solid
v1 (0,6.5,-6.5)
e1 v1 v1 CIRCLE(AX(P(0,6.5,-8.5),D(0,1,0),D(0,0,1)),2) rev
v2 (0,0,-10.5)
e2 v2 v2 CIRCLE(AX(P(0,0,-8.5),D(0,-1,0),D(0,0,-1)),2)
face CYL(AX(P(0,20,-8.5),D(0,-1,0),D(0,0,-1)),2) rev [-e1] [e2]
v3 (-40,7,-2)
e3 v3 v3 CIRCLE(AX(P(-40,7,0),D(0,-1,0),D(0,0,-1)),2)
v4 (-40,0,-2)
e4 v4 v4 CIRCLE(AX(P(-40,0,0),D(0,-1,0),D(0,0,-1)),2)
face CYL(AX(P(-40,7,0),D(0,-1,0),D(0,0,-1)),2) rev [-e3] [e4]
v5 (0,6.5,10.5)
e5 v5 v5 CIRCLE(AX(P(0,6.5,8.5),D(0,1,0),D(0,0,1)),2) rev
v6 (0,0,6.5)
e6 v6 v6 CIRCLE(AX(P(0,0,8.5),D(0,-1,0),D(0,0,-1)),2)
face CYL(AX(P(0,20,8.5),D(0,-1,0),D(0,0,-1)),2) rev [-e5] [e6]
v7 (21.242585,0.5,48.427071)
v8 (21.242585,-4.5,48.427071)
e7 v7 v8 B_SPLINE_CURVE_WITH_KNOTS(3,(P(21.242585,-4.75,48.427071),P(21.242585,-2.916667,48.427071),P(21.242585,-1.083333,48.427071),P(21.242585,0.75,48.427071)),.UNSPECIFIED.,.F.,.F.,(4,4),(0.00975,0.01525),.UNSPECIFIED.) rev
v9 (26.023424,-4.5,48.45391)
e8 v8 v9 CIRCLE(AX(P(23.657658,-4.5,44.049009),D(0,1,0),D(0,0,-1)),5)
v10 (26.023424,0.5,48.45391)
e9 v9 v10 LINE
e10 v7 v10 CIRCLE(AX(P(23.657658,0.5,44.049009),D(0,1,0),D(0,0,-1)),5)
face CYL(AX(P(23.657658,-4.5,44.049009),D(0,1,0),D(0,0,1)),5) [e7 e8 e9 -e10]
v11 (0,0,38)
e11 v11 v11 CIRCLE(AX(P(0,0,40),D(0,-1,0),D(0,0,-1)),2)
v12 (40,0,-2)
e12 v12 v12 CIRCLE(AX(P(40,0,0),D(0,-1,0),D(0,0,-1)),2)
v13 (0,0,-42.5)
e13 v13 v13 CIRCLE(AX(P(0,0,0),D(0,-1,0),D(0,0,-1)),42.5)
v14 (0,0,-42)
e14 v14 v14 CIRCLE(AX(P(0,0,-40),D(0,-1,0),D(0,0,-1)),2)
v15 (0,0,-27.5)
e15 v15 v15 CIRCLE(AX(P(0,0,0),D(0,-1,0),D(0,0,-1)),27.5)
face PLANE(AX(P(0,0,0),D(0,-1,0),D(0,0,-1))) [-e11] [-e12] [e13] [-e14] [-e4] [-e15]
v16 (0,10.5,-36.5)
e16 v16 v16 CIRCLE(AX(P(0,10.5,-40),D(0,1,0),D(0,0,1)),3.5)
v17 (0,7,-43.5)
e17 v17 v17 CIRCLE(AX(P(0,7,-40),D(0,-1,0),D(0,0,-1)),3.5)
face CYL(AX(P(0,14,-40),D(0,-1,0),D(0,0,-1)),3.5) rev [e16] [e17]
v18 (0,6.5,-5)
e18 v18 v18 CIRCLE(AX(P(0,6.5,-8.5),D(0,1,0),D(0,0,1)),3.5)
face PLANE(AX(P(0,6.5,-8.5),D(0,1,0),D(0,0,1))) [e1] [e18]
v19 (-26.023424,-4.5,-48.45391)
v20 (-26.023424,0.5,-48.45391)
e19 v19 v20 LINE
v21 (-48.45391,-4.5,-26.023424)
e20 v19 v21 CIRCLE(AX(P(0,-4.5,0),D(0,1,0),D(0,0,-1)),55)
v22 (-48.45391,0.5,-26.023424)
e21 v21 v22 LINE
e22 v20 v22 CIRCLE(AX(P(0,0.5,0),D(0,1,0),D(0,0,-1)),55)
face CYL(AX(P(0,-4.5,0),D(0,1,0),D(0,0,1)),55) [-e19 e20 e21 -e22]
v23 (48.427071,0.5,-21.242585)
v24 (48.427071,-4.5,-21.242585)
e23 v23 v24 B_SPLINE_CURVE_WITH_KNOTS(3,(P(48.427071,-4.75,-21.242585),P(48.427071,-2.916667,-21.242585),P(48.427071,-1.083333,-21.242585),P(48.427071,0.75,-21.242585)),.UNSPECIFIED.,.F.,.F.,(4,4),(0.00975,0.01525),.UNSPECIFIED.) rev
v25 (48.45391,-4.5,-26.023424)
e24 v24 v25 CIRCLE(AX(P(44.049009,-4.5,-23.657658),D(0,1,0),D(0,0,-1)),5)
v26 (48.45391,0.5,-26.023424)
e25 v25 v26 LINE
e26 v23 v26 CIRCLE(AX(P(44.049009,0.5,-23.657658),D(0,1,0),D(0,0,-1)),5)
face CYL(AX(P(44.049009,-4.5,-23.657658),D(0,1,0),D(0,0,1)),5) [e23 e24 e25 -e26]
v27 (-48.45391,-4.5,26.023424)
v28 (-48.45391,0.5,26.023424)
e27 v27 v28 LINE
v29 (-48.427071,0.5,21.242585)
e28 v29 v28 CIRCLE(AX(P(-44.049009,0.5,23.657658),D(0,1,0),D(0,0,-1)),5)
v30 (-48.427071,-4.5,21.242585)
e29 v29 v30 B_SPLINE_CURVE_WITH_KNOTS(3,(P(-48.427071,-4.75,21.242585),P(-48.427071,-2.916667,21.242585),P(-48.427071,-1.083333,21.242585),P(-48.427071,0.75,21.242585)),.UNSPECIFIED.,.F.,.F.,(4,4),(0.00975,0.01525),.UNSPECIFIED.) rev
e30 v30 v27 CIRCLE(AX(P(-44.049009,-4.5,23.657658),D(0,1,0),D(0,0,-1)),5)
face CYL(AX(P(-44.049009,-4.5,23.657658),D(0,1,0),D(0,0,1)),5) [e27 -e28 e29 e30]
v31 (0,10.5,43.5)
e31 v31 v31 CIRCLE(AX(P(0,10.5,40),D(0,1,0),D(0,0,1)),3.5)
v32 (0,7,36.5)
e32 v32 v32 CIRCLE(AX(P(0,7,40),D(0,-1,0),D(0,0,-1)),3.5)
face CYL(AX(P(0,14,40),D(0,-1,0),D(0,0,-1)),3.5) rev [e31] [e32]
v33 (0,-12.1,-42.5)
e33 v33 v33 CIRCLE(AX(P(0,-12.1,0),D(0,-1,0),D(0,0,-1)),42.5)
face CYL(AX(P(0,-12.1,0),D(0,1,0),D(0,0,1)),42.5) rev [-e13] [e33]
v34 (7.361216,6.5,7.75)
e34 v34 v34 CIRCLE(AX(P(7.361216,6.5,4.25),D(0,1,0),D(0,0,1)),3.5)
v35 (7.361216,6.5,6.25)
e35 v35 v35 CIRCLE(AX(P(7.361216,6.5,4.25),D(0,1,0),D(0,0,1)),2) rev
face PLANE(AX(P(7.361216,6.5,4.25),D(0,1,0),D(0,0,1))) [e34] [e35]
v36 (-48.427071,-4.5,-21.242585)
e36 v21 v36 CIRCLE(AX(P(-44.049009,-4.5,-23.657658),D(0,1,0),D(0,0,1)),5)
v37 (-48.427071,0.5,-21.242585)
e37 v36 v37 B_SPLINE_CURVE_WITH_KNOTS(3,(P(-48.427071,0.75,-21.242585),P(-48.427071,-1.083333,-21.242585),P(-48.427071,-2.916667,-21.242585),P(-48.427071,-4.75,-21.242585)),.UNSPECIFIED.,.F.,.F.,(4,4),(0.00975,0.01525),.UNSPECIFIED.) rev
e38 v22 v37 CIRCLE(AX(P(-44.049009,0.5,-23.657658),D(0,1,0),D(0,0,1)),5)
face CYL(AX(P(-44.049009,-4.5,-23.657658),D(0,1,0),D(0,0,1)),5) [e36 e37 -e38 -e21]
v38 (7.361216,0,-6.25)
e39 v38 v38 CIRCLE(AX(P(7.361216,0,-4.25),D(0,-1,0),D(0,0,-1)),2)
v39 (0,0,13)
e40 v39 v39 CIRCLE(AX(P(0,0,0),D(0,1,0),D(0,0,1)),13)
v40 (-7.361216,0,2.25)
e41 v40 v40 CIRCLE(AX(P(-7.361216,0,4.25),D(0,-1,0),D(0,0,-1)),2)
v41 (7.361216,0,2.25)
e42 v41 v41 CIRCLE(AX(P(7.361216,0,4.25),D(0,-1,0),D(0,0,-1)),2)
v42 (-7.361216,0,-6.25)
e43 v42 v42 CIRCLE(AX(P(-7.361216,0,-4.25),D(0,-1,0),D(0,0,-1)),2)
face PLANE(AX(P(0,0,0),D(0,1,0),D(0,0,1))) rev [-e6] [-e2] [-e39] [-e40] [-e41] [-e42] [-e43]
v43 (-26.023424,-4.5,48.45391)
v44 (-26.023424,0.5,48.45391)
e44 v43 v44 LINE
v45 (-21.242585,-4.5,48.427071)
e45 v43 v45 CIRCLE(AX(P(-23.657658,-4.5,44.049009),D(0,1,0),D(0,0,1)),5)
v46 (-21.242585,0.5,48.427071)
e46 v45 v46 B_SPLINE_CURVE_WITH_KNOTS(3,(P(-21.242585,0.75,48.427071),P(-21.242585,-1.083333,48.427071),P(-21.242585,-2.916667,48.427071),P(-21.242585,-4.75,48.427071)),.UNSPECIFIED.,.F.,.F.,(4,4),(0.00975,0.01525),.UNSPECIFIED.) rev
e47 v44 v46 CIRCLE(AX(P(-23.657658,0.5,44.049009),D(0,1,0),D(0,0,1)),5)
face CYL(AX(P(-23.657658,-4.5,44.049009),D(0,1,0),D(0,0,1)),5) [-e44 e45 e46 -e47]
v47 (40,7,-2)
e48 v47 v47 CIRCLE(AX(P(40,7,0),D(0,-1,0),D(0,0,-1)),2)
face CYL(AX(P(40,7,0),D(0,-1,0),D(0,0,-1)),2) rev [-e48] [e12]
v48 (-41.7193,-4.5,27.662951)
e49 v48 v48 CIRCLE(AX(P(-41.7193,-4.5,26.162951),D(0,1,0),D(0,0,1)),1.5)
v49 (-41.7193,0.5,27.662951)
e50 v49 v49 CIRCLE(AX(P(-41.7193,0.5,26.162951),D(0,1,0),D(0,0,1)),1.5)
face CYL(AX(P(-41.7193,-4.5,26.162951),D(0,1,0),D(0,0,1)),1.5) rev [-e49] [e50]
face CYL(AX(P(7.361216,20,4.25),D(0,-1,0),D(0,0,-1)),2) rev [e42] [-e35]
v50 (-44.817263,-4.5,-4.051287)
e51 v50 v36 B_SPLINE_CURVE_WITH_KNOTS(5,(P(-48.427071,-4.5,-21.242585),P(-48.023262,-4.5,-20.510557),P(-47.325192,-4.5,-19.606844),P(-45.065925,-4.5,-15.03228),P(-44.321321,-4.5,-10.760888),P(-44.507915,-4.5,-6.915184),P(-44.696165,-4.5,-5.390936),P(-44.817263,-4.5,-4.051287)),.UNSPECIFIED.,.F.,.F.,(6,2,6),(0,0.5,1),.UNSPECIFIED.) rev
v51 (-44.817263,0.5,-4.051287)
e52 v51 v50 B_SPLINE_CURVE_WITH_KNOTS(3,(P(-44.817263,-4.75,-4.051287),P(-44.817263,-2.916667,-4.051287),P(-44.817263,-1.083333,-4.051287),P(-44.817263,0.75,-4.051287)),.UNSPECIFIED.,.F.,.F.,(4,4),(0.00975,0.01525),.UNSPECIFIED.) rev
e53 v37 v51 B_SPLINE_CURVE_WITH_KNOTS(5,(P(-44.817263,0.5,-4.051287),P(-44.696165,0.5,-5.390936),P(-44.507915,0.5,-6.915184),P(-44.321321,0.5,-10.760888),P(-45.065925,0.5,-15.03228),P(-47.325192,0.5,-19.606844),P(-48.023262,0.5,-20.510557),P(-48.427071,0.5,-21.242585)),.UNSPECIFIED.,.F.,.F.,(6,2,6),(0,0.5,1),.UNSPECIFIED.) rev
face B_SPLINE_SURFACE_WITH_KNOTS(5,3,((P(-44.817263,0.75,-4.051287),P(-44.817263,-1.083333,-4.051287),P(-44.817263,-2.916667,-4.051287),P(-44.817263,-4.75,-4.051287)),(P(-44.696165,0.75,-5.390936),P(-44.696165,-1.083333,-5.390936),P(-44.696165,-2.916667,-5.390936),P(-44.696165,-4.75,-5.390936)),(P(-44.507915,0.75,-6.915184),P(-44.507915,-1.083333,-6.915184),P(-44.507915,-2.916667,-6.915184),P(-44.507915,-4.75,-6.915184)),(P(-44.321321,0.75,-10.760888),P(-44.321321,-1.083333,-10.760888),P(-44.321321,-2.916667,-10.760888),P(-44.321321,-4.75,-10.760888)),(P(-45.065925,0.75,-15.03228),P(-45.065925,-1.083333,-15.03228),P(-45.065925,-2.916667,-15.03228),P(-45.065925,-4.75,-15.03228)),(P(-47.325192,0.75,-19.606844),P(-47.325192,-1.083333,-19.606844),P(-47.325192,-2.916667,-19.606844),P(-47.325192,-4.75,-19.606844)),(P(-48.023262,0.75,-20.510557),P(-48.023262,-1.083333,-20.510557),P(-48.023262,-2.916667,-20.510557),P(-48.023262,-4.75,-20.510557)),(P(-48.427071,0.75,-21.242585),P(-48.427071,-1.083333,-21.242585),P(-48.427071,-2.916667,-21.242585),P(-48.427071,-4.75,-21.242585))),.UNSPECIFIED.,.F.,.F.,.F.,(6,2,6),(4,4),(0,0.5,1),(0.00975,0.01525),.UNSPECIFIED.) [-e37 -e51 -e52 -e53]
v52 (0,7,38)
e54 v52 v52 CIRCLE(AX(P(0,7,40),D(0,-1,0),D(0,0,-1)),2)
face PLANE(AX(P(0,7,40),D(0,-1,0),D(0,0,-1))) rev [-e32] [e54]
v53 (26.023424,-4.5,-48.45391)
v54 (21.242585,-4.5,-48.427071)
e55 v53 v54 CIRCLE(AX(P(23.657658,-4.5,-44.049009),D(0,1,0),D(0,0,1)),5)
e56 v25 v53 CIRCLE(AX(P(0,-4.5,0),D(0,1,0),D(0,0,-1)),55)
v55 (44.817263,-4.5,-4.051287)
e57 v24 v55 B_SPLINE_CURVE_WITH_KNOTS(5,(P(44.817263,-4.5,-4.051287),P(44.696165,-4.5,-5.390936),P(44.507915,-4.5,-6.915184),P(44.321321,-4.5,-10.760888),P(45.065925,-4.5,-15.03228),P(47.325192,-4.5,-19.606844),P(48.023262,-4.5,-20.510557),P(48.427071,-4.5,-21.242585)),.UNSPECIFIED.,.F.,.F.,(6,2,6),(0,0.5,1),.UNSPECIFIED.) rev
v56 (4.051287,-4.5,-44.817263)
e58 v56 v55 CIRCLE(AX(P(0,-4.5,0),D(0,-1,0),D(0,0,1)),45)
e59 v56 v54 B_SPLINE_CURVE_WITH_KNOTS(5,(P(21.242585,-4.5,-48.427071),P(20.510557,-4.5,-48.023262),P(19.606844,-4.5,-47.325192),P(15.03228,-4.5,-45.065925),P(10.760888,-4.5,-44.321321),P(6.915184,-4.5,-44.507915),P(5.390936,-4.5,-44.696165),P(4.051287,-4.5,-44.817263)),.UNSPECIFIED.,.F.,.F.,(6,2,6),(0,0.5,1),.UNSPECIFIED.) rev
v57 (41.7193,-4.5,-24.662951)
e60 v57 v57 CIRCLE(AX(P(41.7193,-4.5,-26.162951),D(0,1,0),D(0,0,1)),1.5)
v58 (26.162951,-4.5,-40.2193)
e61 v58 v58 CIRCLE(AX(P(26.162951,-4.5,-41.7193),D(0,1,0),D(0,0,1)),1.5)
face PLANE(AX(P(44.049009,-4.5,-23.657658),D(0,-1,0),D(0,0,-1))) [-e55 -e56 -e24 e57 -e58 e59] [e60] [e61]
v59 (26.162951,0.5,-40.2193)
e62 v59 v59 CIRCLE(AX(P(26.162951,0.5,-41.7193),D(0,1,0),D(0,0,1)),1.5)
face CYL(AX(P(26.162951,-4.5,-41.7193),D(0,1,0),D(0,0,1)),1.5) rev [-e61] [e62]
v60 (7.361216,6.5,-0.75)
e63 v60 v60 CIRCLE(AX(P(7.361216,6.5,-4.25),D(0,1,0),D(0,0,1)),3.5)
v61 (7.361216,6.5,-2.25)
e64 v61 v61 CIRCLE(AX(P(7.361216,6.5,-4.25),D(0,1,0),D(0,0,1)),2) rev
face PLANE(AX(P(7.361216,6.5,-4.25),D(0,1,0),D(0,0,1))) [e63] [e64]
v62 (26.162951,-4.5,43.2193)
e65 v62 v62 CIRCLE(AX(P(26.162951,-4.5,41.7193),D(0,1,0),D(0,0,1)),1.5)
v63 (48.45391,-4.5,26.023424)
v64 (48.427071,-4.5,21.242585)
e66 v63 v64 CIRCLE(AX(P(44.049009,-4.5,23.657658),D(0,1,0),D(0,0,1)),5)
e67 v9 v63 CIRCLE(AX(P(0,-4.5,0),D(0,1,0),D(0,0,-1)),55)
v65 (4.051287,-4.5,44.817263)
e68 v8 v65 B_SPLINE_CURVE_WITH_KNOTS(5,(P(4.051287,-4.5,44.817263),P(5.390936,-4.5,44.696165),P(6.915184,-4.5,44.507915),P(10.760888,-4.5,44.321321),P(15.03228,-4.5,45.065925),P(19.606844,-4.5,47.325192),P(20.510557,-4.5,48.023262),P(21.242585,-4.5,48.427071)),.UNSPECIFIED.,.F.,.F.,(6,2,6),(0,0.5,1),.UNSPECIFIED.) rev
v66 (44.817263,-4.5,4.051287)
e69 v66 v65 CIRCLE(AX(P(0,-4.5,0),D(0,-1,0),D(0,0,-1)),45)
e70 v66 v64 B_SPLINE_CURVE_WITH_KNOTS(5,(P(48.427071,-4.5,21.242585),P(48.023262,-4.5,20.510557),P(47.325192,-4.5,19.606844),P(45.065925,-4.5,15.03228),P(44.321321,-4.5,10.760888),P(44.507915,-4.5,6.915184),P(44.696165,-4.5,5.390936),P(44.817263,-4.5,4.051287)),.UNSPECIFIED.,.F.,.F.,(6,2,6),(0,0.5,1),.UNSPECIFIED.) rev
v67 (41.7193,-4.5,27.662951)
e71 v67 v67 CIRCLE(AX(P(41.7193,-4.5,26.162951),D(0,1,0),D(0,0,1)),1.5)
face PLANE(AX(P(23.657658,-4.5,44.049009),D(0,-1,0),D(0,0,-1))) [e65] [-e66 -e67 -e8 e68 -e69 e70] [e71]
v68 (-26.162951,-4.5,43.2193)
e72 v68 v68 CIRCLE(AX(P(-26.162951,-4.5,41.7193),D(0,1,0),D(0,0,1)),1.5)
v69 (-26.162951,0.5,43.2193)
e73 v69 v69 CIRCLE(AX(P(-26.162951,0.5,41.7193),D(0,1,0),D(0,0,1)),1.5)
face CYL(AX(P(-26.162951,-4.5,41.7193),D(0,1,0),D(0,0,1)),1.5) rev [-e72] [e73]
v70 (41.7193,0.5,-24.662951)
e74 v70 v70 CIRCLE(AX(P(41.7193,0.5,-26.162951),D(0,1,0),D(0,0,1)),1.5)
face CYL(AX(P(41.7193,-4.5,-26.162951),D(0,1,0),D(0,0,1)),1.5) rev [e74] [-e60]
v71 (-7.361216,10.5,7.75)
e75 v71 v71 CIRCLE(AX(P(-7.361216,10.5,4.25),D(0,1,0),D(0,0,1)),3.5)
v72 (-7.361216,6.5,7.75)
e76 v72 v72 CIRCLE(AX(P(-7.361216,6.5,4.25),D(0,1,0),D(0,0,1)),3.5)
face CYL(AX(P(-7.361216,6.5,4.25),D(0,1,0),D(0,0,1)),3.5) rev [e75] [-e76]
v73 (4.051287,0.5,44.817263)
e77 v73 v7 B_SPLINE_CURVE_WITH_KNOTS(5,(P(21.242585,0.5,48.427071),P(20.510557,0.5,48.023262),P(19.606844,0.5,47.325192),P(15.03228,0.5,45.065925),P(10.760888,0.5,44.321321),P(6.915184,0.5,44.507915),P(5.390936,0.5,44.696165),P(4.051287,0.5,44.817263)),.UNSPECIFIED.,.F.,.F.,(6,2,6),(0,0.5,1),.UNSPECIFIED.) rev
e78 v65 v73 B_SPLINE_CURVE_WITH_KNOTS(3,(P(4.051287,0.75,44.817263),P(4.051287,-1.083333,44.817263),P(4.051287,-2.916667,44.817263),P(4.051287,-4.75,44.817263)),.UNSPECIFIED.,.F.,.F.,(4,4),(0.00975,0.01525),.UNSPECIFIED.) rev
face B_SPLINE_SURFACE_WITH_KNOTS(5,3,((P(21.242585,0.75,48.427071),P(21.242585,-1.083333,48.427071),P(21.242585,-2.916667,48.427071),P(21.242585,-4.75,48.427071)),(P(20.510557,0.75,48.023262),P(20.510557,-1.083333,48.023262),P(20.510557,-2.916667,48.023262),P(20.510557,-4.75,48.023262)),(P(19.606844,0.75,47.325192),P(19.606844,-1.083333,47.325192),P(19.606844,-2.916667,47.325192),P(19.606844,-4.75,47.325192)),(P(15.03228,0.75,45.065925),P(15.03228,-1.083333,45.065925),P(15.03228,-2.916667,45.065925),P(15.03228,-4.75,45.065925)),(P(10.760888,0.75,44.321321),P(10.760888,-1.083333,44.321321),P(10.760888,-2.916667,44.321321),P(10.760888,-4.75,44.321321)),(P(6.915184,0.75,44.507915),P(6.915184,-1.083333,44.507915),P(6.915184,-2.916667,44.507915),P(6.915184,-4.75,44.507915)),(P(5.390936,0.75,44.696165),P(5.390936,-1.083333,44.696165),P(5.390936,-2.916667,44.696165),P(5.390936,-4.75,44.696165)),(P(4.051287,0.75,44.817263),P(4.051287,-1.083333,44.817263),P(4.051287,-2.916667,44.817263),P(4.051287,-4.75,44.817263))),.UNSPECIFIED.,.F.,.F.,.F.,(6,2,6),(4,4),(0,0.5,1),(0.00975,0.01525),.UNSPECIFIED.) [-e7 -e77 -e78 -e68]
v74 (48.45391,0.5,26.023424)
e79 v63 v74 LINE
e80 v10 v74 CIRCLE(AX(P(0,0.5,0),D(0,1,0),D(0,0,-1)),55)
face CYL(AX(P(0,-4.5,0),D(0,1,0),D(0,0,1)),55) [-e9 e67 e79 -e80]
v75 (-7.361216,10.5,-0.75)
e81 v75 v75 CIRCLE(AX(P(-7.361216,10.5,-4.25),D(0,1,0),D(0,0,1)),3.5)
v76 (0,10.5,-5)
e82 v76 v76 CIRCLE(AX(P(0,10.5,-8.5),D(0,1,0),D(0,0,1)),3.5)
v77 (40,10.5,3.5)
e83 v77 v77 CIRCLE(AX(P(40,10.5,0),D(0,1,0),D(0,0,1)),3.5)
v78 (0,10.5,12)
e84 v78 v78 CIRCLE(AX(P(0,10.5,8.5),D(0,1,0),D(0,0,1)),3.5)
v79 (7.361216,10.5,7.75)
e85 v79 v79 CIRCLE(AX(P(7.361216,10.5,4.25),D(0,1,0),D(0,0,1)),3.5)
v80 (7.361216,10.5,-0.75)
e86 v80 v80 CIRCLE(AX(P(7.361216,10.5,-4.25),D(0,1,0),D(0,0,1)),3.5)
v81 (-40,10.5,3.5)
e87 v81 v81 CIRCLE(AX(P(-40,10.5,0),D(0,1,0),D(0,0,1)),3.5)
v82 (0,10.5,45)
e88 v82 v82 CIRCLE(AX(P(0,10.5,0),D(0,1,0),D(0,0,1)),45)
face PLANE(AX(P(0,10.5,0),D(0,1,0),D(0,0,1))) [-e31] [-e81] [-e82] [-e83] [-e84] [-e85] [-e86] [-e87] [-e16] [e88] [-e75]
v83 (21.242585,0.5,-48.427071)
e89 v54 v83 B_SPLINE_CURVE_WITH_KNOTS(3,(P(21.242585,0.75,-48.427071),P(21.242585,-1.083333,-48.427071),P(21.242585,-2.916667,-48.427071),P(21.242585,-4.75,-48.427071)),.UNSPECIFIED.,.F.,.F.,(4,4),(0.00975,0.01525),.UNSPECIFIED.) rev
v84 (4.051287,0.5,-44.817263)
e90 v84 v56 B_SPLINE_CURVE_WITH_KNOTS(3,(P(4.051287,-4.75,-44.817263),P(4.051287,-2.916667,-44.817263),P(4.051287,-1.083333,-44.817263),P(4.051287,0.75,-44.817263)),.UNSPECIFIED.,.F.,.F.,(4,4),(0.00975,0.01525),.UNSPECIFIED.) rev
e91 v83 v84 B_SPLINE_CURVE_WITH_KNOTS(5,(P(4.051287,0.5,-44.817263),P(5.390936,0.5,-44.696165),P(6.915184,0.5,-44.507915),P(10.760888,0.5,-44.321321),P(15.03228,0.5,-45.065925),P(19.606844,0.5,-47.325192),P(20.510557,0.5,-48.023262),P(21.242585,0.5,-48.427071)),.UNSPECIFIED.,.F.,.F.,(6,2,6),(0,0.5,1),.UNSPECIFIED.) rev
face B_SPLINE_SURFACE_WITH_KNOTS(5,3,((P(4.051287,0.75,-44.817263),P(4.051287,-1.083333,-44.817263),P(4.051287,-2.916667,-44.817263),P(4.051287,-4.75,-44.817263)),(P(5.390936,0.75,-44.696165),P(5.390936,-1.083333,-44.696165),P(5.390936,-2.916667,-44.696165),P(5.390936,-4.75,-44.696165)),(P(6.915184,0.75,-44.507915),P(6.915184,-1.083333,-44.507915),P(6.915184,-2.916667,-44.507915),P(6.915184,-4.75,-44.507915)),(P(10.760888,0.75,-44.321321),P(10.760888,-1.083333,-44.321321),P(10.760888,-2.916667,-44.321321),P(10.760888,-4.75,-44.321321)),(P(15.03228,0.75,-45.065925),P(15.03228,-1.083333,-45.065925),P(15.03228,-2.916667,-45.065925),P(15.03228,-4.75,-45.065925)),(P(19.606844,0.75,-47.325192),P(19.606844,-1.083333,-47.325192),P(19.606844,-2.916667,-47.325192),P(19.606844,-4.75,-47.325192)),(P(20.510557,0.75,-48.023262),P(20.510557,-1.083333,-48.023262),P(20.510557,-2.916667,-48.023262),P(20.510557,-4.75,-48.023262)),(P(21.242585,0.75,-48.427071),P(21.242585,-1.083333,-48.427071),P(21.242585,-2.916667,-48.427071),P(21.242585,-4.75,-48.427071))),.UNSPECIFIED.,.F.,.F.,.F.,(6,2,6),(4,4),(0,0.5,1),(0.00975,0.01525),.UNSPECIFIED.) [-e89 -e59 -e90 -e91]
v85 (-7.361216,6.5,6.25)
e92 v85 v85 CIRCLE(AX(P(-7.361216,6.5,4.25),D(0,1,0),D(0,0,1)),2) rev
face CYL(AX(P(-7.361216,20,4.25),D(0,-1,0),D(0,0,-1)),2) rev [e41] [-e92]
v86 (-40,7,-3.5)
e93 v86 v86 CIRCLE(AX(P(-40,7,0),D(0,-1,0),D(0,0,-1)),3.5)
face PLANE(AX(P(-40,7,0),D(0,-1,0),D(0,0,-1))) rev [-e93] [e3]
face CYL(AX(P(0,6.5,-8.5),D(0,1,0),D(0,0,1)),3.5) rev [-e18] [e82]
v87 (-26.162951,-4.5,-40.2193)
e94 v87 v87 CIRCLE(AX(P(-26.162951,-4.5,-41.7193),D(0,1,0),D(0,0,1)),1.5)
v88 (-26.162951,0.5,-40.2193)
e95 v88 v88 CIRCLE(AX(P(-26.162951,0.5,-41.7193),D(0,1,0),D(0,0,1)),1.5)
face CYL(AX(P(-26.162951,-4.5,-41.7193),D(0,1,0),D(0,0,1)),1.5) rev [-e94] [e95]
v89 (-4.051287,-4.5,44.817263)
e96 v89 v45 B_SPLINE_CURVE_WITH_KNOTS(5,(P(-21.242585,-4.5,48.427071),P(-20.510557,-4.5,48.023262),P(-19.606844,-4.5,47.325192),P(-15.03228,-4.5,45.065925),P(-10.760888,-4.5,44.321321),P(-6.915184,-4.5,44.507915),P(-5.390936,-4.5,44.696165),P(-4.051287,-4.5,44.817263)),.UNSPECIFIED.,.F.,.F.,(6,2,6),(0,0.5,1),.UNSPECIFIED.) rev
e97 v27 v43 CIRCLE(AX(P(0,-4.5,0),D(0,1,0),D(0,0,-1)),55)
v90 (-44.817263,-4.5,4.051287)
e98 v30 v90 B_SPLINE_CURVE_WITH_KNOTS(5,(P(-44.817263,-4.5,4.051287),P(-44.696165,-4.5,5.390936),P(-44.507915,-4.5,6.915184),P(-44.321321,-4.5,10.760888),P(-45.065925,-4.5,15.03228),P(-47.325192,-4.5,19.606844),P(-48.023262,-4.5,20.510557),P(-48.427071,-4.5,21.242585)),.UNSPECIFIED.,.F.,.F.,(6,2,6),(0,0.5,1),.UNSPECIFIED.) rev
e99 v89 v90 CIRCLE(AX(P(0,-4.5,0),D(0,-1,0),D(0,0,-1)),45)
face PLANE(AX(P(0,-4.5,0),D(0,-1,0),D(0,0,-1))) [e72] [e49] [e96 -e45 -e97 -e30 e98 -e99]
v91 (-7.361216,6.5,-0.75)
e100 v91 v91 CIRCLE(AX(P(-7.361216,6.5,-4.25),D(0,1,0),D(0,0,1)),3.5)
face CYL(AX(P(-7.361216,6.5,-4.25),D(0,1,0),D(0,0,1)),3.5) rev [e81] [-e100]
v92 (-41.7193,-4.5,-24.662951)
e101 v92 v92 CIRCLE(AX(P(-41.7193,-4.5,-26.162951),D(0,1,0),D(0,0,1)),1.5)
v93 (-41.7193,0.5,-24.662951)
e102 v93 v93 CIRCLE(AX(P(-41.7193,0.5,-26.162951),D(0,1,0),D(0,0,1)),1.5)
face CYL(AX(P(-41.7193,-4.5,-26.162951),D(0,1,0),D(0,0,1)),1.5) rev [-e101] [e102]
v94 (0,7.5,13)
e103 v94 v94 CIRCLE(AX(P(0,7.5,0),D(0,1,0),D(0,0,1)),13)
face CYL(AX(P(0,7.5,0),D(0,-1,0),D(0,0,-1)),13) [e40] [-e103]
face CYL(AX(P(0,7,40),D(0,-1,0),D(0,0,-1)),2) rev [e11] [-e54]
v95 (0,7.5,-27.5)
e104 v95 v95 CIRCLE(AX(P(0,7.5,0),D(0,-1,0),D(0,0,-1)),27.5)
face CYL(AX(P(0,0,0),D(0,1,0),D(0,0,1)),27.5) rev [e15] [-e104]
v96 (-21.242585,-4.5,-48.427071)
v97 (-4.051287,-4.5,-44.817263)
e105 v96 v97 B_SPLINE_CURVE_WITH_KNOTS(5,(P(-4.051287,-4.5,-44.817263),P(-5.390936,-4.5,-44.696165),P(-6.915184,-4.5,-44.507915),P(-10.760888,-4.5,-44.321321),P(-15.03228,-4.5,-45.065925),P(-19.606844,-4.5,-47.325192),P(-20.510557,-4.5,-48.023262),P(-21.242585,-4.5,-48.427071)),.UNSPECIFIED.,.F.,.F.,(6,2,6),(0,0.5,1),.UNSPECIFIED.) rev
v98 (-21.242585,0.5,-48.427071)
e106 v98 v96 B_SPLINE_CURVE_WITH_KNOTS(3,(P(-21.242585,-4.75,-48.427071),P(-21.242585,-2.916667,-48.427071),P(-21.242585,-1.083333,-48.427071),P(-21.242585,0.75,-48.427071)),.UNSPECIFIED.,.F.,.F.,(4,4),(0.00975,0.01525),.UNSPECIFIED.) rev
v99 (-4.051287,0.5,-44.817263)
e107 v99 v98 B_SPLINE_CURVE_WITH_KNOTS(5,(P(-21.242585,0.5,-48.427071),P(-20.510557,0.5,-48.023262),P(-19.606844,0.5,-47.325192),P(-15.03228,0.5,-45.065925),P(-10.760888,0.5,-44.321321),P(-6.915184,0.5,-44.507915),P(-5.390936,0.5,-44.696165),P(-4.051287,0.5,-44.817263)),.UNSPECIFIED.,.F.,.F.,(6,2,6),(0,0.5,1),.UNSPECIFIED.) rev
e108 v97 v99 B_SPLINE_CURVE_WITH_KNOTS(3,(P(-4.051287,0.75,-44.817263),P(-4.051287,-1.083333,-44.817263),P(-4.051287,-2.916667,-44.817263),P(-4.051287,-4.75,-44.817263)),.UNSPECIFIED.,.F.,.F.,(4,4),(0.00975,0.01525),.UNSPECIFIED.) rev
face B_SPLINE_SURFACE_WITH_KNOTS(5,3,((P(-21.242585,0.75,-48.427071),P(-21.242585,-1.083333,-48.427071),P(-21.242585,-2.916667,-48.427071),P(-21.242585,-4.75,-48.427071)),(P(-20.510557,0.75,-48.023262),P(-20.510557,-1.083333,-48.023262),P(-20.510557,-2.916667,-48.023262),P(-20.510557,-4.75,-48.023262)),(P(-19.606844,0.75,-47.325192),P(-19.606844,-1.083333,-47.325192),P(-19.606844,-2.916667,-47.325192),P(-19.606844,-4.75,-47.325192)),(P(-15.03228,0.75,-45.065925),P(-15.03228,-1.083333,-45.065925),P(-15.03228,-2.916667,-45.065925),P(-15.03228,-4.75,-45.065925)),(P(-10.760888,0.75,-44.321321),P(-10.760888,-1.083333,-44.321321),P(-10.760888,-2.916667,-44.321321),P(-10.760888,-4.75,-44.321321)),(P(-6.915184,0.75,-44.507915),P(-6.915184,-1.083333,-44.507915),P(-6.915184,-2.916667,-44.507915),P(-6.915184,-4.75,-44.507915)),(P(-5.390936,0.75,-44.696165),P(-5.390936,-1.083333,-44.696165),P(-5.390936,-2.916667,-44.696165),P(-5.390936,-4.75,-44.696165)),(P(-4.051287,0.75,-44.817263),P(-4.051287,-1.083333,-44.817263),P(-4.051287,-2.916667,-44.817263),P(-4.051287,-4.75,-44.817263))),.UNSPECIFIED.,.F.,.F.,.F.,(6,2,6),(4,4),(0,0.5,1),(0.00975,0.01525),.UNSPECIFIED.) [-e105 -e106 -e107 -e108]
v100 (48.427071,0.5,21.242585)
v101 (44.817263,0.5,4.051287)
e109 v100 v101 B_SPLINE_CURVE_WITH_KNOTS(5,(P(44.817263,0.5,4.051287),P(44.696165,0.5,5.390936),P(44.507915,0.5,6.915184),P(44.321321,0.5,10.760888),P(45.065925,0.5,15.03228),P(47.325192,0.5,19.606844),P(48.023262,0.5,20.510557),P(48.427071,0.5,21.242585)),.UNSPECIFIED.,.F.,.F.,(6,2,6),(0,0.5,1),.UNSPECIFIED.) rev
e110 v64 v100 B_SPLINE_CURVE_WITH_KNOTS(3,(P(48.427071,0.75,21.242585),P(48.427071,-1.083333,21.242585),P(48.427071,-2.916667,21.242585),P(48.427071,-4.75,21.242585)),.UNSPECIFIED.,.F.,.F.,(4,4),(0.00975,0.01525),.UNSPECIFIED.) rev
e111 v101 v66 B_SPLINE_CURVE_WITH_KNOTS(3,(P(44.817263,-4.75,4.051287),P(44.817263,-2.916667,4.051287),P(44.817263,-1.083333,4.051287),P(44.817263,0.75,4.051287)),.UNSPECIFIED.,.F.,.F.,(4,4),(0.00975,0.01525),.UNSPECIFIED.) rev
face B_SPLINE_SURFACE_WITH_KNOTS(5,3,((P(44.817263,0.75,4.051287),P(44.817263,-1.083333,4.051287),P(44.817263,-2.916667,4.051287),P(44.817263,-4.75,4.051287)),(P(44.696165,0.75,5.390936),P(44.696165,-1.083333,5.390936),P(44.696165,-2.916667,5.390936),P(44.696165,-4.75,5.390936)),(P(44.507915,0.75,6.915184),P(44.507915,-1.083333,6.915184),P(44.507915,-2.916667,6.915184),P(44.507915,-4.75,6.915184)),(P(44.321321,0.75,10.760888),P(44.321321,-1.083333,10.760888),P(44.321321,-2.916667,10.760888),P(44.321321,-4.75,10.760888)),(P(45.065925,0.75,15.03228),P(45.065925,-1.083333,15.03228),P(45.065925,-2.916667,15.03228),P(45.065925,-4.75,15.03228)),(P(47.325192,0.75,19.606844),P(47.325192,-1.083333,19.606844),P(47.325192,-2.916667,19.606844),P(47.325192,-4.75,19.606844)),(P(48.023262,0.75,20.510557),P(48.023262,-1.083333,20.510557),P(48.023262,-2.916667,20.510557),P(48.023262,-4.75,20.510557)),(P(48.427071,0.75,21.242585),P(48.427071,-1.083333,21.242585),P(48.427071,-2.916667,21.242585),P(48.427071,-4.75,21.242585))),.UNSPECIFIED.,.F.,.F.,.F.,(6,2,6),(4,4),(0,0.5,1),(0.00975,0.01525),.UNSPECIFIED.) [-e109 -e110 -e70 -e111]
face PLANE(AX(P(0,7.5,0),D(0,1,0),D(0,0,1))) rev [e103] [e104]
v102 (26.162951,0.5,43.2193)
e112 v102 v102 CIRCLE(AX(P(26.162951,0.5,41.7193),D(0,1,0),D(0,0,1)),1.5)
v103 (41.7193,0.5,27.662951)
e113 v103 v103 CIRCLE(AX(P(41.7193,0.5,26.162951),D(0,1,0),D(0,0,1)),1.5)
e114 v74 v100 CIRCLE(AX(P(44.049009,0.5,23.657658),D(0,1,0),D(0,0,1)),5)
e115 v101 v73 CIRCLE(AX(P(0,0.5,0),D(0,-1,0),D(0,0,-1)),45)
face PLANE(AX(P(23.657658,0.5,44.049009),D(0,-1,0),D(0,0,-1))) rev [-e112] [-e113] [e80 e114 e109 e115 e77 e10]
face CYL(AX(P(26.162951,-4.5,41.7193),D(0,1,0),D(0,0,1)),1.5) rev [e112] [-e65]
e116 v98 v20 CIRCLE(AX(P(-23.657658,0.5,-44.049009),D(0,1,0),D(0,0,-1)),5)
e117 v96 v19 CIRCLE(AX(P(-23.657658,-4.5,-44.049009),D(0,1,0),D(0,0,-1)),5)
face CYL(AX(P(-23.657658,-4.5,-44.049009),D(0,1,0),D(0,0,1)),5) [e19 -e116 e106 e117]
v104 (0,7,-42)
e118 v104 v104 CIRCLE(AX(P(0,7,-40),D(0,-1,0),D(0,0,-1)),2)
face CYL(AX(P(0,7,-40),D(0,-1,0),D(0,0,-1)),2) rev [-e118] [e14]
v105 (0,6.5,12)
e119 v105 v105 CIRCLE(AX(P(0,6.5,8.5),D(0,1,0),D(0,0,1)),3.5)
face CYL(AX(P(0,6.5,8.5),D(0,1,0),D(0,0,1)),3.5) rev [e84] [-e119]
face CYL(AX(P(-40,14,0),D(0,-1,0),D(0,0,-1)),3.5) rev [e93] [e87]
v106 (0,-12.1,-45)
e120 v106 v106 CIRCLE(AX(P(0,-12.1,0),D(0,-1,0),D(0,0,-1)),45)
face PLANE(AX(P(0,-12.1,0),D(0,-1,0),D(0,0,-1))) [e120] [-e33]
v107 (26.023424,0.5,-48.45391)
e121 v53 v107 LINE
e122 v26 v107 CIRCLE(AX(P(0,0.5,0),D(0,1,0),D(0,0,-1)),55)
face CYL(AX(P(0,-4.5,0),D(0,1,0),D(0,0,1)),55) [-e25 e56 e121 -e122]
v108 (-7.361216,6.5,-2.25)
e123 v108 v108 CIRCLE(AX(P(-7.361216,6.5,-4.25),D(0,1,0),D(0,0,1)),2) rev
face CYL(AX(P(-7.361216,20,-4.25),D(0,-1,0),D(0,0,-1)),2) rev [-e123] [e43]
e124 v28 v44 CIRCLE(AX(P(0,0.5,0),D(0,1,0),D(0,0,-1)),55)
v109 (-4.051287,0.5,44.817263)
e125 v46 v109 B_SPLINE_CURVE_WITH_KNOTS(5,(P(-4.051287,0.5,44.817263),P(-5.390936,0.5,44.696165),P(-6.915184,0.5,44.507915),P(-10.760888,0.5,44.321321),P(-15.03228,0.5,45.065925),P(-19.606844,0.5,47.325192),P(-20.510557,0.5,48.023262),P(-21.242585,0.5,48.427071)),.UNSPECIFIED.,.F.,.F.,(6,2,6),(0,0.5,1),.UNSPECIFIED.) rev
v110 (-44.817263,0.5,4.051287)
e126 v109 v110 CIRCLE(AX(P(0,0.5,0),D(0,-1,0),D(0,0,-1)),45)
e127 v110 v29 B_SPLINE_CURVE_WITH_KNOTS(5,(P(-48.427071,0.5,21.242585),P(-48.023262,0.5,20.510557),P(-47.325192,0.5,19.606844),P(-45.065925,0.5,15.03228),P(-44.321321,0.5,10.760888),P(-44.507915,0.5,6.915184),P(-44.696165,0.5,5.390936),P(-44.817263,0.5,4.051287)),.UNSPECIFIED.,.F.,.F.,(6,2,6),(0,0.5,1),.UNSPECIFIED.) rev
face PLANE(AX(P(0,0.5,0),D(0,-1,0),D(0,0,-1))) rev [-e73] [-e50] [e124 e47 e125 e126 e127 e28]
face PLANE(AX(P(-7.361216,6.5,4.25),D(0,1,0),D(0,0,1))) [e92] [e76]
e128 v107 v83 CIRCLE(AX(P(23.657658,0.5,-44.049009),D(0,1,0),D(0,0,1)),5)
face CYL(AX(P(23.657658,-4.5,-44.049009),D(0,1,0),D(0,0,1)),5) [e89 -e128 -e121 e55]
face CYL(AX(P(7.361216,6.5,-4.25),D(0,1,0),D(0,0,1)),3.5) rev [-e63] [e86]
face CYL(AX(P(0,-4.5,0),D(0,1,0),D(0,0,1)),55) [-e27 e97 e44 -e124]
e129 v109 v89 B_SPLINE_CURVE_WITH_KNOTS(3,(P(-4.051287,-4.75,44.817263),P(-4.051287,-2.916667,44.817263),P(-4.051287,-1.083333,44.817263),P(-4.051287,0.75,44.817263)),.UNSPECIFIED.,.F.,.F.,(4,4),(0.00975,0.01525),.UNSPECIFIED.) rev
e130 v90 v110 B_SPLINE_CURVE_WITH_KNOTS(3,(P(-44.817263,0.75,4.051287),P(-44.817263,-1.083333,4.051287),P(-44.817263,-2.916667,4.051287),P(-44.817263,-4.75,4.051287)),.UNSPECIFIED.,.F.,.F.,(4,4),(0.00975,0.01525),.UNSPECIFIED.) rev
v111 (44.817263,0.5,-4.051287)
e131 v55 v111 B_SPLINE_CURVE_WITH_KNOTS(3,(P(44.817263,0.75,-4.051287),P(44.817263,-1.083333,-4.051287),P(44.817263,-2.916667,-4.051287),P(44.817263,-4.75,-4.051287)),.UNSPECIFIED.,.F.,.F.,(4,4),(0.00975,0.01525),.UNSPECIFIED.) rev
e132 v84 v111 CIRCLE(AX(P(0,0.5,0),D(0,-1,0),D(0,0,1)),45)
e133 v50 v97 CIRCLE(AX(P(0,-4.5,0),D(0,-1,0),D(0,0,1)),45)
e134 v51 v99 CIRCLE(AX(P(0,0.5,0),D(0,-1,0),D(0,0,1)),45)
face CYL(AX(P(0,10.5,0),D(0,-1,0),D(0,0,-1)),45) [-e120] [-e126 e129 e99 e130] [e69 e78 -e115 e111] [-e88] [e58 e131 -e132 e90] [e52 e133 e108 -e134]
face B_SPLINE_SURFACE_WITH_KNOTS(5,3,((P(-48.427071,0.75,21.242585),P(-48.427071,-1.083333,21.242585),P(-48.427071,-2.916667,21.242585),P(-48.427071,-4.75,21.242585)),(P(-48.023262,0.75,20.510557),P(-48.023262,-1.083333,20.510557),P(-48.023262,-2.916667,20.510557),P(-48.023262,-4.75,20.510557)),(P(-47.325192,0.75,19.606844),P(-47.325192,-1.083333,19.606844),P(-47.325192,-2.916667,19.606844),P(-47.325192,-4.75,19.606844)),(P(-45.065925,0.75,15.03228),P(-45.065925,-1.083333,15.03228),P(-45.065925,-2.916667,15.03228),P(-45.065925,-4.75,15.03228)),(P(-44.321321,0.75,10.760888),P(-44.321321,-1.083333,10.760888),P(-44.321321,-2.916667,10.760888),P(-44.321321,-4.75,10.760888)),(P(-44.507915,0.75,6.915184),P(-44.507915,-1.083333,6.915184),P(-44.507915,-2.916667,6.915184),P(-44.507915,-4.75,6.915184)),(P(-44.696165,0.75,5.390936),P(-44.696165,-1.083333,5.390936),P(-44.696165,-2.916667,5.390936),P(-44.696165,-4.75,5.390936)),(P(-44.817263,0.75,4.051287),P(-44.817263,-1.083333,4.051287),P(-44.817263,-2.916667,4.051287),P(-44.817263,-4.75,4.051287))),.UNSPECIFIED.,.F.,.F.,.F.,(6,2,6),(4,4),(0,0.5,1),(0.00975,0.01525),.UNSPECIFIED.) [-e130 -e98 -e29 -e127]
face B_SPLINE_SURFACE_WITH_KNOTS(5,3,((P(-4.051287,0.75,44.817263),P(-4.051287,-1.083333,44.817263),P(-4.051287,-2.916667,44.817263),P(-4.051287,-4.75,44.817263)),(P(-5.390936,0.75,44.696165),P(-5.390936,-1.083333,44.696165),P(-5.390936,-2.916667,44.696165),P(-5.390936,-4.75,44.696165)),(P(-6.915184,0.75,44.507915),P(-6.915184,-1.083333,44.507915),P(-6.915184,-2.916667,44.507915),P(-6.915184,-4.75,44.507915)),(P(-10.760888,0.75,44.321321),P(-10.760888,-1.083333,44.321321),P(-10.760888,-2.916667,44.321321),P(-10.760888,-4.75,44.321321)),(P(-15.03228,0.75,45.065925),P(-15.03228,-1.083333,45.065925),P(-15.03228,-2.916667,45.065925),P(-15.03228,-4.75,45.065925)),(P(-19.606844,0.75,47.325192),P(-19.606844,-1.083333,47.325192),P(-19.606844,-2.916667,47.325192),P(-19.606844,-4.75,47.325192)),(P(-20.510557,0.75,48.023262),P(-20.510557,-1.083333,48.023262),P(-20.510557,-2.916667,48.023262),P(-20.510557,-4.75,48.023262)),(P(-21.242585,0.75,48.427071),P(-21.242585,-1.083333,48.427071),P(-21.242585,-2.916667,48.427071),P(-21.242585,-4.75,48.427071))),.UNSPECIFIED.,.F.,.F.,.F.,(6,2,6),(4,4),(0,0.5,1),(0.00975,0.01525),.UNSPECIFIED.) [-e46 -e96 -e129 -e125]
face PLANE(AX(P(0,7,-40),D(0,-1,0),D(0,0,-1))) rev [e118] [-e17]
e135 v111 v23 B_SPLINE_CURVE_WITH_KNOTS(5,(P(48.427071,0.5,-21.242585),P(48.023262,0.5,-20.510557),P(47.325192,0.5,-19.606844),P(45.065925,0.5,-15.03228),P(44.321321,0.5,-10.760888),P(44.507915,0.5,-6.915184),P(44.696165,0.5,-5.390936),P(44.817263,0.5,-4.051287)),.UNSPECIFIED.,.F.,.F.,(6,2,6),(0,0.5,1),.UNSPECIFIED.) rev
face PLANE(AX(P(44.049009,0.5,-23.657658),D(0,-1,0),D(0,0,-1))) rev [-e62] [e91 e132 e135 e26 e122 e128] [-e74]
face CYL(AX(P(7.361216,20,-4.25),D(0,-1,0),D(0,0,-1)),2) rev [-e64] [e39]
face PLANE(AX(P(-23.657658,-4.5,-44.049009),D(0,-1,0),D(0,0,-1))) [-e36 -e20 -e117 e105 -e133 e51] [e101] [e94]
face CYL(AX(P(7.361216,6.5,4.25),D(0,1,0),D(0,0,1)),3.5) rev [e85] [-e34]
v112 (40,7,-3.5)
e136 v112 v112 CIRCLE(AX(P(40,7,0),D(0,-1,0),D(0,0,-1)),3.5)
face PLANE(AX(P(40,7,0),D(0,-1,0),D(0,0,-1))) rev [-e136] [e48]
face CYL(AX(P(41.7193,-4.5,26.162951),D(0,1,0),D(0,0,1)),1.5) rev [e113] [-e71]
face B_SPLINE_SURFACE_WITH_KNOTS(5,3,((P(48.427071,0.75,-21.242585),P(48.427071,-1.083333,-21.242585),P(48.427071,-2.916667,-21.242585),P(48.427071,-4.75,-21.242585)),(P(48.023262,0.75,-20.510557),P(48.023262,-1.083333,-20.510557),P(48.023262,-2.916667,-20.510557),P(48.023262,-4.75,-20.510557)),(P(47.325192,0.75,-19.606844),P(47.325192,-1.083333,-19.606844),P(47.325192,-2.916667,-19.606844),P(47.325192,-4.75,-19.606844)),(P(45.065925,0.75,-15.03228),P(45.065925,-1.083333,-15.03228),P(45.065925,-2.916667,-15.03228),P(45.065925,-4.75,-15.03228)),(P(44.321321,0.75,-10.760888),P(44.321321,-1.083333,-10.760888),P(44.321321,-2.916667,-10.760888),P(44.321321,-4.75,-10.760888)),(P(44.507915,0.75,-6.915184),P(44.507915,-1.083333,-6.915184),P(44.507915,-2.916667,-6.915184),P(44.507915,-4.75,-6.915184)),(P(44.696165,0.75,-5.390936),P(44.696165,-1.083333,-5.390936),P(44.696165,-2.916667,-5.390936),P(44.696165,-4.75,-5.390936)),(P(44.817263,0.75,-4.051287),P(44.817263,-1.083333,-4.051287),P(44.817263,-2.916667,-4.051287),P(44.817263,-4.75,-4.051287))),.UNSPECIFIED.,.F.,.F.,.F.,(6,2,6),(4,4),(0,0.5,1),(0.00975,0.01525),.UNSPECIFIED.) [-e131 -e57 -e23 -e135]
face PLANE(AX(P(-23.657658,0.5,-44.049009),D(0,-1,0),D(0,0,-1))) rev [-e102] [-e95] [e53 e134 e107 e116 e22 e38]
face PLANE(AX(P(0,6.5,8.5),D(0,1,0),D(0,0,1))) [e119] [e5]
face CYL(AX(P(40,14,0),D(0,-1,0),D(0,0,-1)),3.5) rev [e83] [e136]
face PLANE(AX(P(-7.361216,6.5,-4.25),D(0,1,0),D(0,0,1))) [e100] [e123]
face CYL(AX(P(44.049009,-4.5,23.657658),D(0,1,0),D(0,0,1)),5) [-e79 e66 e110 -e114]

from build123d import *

# Parameters (mm, degrees)
ESQUISSE1_R             = 13
BOSS_EXTRU_1_DEPTH      = 7.5
ESQUISSE2_R             = 45
BOSS_EXTRU_2_DEPTH      = 3
ESQUISSE3_R             = 2
ENL_V_MAT_EXTRU_1_DEPTH = 20
ESQUISSE4_R             = 3.5
ENL_V_MAT_EXTRU_2_DEPTH = 4
BOSS_EXTRU_3_START      = 19.6
ESQUISSE7_R             = 45
ESQUISSE7_R_2           = 42.5
BOSS_EXTRU_3_DEPTH      = 19.6
BOSS_EXTRU_4_START      = 7.5
ESQUISSE8_R             = 42.5
ESQUISSE8_R_2           = 27.5
BOSS_EXTRU_4_DEPTH      = 7.5
ESQUISSE9_R             = 2
ENL_V_MAT_EXTRU_3_DEPTH = 7
ESQUISSE10_R            = 3.5
ENL_V_MAT_EXTRU_4_DEPTH = 7
BOSS_EXTRU_5_START      = -15
ESQUISSE11_R            = 1.5
BOSS_EXTRU_5_DEPTH      = 5
CONG_1_START            = -4.5
CONG_1_DEPTH            = 5


with BuildPart() as part:
    # Esquisse1 → Boss.-Extru.1 (new body)
    with BuildSketch(Plane(origin=(0, 0, 0), x_dir=(1, 0, 0), z_dir=(0, 1, 0))):
        with Locations(Location((0, 0, 0), (0, 0, 270))):
            Circle(ESQUISSE1_R)
    extrude(amount=BOSS_EXTRU_1_DEPTH)

    # Esquisse2 → Boss.-Extru.2 (add)
    with BuildSketch(Plane(origin=(0, 7.5, 0), x_dir=(1, 0, 0), z_dir=(0, 1, 0))):
        with Locations(Location((0, 0, 0), (0, 0, 270))):
            Circle(ESQUISSE2_R)
    extrude(amount=BOSS_EXTRU_2_DEPTH)

    # Esquisse3 → Enlèv. mat.-Extru.1 (cut)
    with BuildSketch(Plane.XZ):
        with Locations(Location((0, 8.5, 0), (0, 0, 270))):
            Circle(ESQUISSE3_R)
        with Locations(Location((7.361215932, 4.25, 0), (0, 0, 270))):
            Circle(ESQUISSE3_R)
        with Locations(Location((7.361215932, -4.25, 0), (0, 0, 270))):
            Circle(ESQUISSE3_R)
        with Locations(Location((0, -8.5, 0), (0, 0, 270))):
            Circle(ESQUISSE3_R)
        with Locations(Location((-7.361215932, -4.25, 0), (0, 0, 270))):
            Circle(ESQUISSE3_R)
        with Locations(Location((-7.361215932, 4.25, 0), (0, 0, 270))):
            Circle(ESQUISSE3_R)
    extrude(amount=-ENL_V_MAT_EXTRU_1_DEPTH, mode=Mode.SUBTRACT)

    # Esquisse4 → Enlèv. mat.-Extru.2 (cut)
    with BuildSketch(Plane(origin=(0, 10.5, 0), x_dir=(1, 0, 0), z_dir=(0, 1, 0))):
        with Locations(Location((0, 8.5, 0), (0, 0, 270))):
            Circle(ESQUISSE4_R)
        with Locations(Location((7.361215932, 4.25, 0), (0, 0, 270))):
            Circle(ESQUISSE4_R)
        with Locations(Location((7.361215932, -4.25, 0), (0, 0, 270))):
            Circle(ESQUISSE4_R)
        with Locations(Location((0, -8.5, 0), (0, 0, 270))):
            Circle(ESQUISSE4_R)
        with Locations(Location((-7.361215932, -4.25, 0), (0, 0, 270))):
            Circle(ESQUISSE4_R)
        with Locations(Location((-7.361215932, 4.25, 0), (0, 0, 270))):
            Circle(ESQUISSE4_R)
    extrude(amount=-ENL_V_MAT_EXTRU_2_DEPTH, mode=Mode.SUBTRACT)

    # Esquisse7 → Boss.-Extru.3 (add)
    with BuildSketch(Plane(origin=(0, 7.5, 0), x_dir=(-1, 0, 0), z_dir=(0, -1, 0)).offset(BOSS_EXTRU_3_START)):
        with Locations(Location((0, 0, 0), (0, 0, 90))):
            Circle(ESQUISSE7_R)
        with Locations(Location((0, 0, 0), (0, 0, 90))):
            Circle(ESQUISSE7_R_2, mode=Mode.SUBTRACT)
    extrude(amount=-BOSS_EXTRU_3_DEPTH)

    # Esquisse8 → Boss.-Extru.4 (add)
    with BuildSketch(Plane.XZ.offset(-7.5).offset(BOSS_EXTRU_4_START)):
        with Locations(Location((0, 0, 0), (0, 0, 270))):
            Circle(ESQUISSE8_R)
        with Locations(Location((0, 0, 0), (0, 0, 270))):
            Circle(ESQUISSE8_R_2, mode=Mode.SUBTRACT)
    extrude(amount=-BOSS_EXTRU_4_DEPTH)

    # Esquisse9 → Enlèv. mat.-Extru.3 (cut)
    with BuildSketch(Plane.XZ):
        with Locations(Location((0, 40, 0), (0, 0, 270))):
            Circle(ESQUISSE9_R)
        with Locations(Location((40, 0, 0), (0, 0, 270))):
            Circle(ESQUISSE9_R)
        with Locations(Location((0, -40, 0), (0, 0, 270))):
            Circle(ESQUISSE9_R)
        with Locations(Location((-40, 0, 0), (0, 0, 270))):
            Circle(ESQUISSE9_R)
    extrude(amount=-ENL_V_MAT_EXTRU_3_DEPTH, mode=Mode.SUBTRACT)

    # Esquisse10 → Enlèv. mat.-Extru.4 (cut)
    with BuildSketch(Plane.XZ.offset(-7)):
        with Locations(Location((-40, 0, 0), (0, 0, 270))):
            Circle(ESQUISSE10_R)
        with Locations(Location((40, 0, 0), (0, 0, 270))):
            Circle(ESQUISSE10_R)
        with Locations(Location((0, 40, 0), (0, 0, 270))):
            Circle(ESQUISSE10_R)
        with Locations(Location((0, -40, 0), (0, 0, 270))):
            Circle(ESQUISSE10_R)
    extrude(amount=-ENL_V_MAT_EXTRU_4_DEPTH, mode=Mode.SUBTRACT)

    # Esquisse11 → Boss.-Extru.5 (add)
    # profile 1 of 4: a face of its own
    with BuildSketch(Plane(origin=(0, 10.5, 0), x_dir=(1, 0, 0), z_dir=(0, 1, 0)).offset(BOSS_EXTRU_5_START)):
        with BuildLine():
            Line((19.03826038, 45.962426412), (17.220754456, 41.574578963))
            ThreePointArc((17.220754456, 41.574578963), (31.819805153, 31.819805153), (41.574578963, 17.220754456))
            Line((41.574578963, 17.220754456), (45.962426412, 19.03826038))
            ThreePointArc((45.962426412, 19.03826038), (48.758405499, 21.977900032), (48.453910176, 26.023423846))
            ThreePointArc((48.453910176, 26.023423846), (38.890872965, 38.890872965), (26.023423846, 48.453910176))
            ThreePointArc((26.023423846, 48.453910176), (21.977900032, 48.758405499), (19.03826038, 45.962426412))
        make_face()
        with Locations(Location((26.162950904, 41.71930009, 0), (0, 0, 270))):
            Circle(ESQUISSE11_R, mode=Mode.SUBTRACT)
        with Locations(Location((41.71930009, 26.162950904, 0), (0, 0, 270))):
            Circle(ESQUISSE11_R, mode=Mode.SUBTRACT)
    # profile 2 of 4: a face of its own
    with BuildSketch(Plane(origin=(0, 10.5, 0), x_dir=(1, 0, 0), z_dir=(0, 1, 0)).offset(BOSS_EXTRU_5_START)):
        with BuildLine():
            Line((45.962426412, -19.03826038), (41.574578963, -17.220754456))
            ThreePointArc((41.574578963, -17.220754456), (31.819805153, -31.819805153), (17.220754456, -41.574578963))
            Line((17.220754456, -41.574578963), (19.03826038, -45.962426412))
            ThreePointArc((19.03826038, -45.962426412), (21.977900032, -48.758405499), (26.023423846, -48.453910176))
            ThreePointArc((26.023423846, -48.453910176), (38.890872965, -38.890872965), (48.453910176, -26.023423846))
            ThreePointArc((48.453910176, -26.023423846), (48.758405499, -21.977900032), (45.962426412, -19.03826038))
        make_face()
        with Locations(Location((26.162950904, -41.71930009, 0), (0, 0, 270))):
            Circle(ESQUISSE11_R, mode=Mode.SUBTRACT)
        with Locations(Location((41.71930009, -26.162950904, 0), (0, 0, 270))):
            Circle(ESQUISSE11_R, mode=Mode.SUBTRACT)
    # profile 3 of 4: a face of its own
    with BuildSketch(Plane(origin=(0, 10.5, 0), x_dir=(1, 0, 0), z_dir=(0, 1, 0)).offset(BOSS_EXTRU_5_START)):
        with BuildLine():
            Line((-19.03826038, -45.962426412), (-17.220754456, -41.574578963))
            ThreePointArc((-17.220754456, -41.574578963), (-31.819805153, -31.819805153), (-41.574578963, -17.220754456))
            Line((-41.574578963, -17.220754456), (-45.962426412, -19.03826038))
            ThreePointArc((-45.962426412, -19.03826038), (-48.758405499, -21.977900032), (-48.453910176, -26.023423846))
            ThreePointArc((-48.453910176, -26.023423846), (-38.890872965, -38.890872965), (-26.023423846, -48.453910176))
            ThreePointArc((-26.023423846, -48.453910176), (-21.977900032, -48.758405499), (-19.03826038, -45.962426412))
        make_face()
        with Locations(Location((-41.71930009, -26.162950904, 0), (0, 0, 270))):
            Circle(ESQUISSE11_R, mode=Mode.SUBTRACT)
        with Locations(Location((-26.162950904, -41.71930009, 0), (0, 0, 270))):
            Circle(ESQUISSE11_R, mode=Mode.SUBTRACT)
    # profile 4 of 4: a face of its own
    with BuildSketch(Plane(origin=(0, 10.5, 0), x_dir=(1, 0, 0), z_dir=(0, 1, 0)).offset(BOSS_EXTRU_5_START)):
        with BuildLine():
            Line((-45.962426412, 19.03826038), (-41.574578963, 17.220754456))
            ThreePointArc((-41.574578963, 17.220754456), (-31.819805153, 31.819805153), (-17.220754456, 41.574578963))
            Line((-17.220754456, 41.574578963), (-19.03826038, 45.962426412))
            ThreePointArc((-19.03826038, 45.962426412), (-21.977900032, 48.758405499), (-26.023423846, 48.453910176))
            ThreePointArc((-26.023423846, 48.453910176), (-38.890872965, 38.890872965), (-48.453910176, 26.023423846))
            ThreePointArc((-48.453910176, 26.023423846), (-48.758405499, 21.977900032), (-45.962426412, 19.03826038))
        make_face()
        with Locations(Location((-26.162950904, 41.71930009, 0), (0, 0, 270))):
            Circle(ESQUISSE11_R, mode=Mode.SUBTRACT)
        with Locations(Location((-41.71930009, 26.162950904, 0), (0, 0, 270))):
            Circle(ESQUISSE11_R, mode=Mode.SUBTRACT)
    extrude(amount=BOSS_EXTRU_5_DEPTH)


with BuildPart() as cong_1_tool:
    # Congé1: read off the stored shape, not the designer's step
    # Congé1 outline → Congé1 (new body)
    with BuildSketch(Plane(origin=(0, 0, 0), x_dir=(1, 0, 0), z_dir=(0, 1, 0)).offset(CONG_1_START)):
        with BuildLine():
            add(Edge.make_bspline(
                [(-21.242584747, 48.427070577), (-20.510556933, 48.023261518), (-19.606844419, 47.325192253), (-15.032280406, 45.065924827), (-10.760888336, 44.321320902), (-6.91518351, 44.507915279), (-5.390936461, 44.696164597), (-4.051286986, 44.817263122)],
                knots=[0, 0, 0, 0, 0, 0, 0.5, 0.5, 1, 1, 1, 1, 1, 1], degree=5))
            ThreePointArc((-21.242584747, 48.427070577), (-19.930787622, 47.382241446), (-19.03826038, 45.962426412))
            Line((-19.03826038, 45.962426412), (-17.220754456, 41.574578963))
            ThreePointArc((-17.220754456, 41.574578963), (-10.75888874, 43.694923196), (-4.051286986, 44.817263122))
        make_face()
        with BuildLine():
            add(Edge.make_bspline(
                [(4.051286986, 44.817263122), (5.390936461, 44.696164597), (6.91518351, 44.507915279), (10.760888336, 44.321320902), (15.032280406, 45.065924827), (19.606844419, 47.325192253), (20.510556933, 48.023261518), (21.242584747, 48.427070577)],
                knots=[0, 0, 0, 0, 0, 0, 0.5, 0.5, 1, 1, 1, 1, 1, 1], degree=5))
            ThreePointArc((4.051286986, 44.817263122), (10.75888874, 43.694923196), (17.220754456, 41.574578963))
            Line((17.220754456, 41.574578963), (19.03826038, 45.962426412))
            ThreePointArc((19.03826038, 45.962426412), (19.930787622, 47.382241446), (21.242584747, 48.427070577))
        make_face()
        with BuildLine():
            ThreePointArc((-44.817263122, 4.051286986), (-43.694923196, 10.75888874), (-41.574578963, 17.220754456))
            Line((-41.574578963, 17.220754456), (-45.962426412, 19.03826038))
            ThreePointArc((-45.962426412, 19.03826038), (-47.382241446, 19.930787622), (-48.427070577, 21.242584747))
            add(Edge.make_bspline(
                [(-44.817263122, 4.051286986), (-44.696164597, 5.390936461), (-44.507915279, 6.91518351), (-44.321320902, 10.760888336), (-45.065924827, 15.032280406), (-47.325192253, 19.606844419), (-48.023261518, 20.510556933), (-48.427070577, 21.242584747)],
                knots=[0, 0, 0, 0, 0, 0, 0.5, 0.5, 1, 1, 1, 1, 1, 1], degree=5))
        make_face()
        with BuildLine():
            Line((45.962426412, 19.03826038), (41.574578963, 17.220754456))
            ThreePointArc((41.574578963, 17.220754456), (43.694923196, 10.75888874), (44.817263122, 4.051286986))
            add(Edge.make_bspline(
                [(48.427070577, 21.242584747), (48.023261518, 20.510556933), (47.325192253, 19.606844419), (45.065924827, 15.032280406), (44.321320902, 10.760888336), (44.507915279, 6.91518351), (44.696164597, 5.390936461), (44.817263122, 4.051286986)],
                knots=[0, 0, 0, 0, 0, 0, 0.5, 0.5, 1, 1, 1, 1, 1, 1], degree=5))
            ThreePointArc((48.427070577, 21.242584747), (47.382241446, 19.930787622), (45.962426412, 19.03826038))
        make_face()
        with BuildLine():
            ThreePointArc((-41.574578963, -17.220754456), (-43.694923196, -10.75888874), (-44.817263122, -4.051286986))
            add(Edge.make_bspline(
                [(-48.427070577, -21.242584747), (-48.023261518, -20.510556933), (-47.325192253, -19.606844419), (-45.065924827, -15.032280406), (-44.321320902, -10.760888336), (-44.507915279, -6.91518351), (-44.696164597, -5.390936461), (-44.817263122, -4.051286986)],
                knots=[0, 0, 0, 0, 0, 0, 0.5, 0.5, 1, 1, 1, 1, 1, 1], degree=5))
            ThreePointArc((-48.427070577, -21.242584747), (-47.382241446, -19.930787622), (-45.962426412, -19.03826038))
            Line((-45.962426412, -19.03826038), (-41.574578963, -17.220754456))
        make_face()
        with BuildLine():
            add(Edge.make_bspline(
                [(44.817263122, -4.051286986), (44.696164597, -5.390936461), (44.507915279, -6.91518351), (44.321320902, -10.760888336), (45.065924827, -15.032280406), (47.325192253, -19.606844419), (48.023261518, -20.510556933), (48.427070577, -21.242584747)],
                knots=[0, 0, 0, 0, 0, 0, 0.5, 0.5, 1, 1, 1, 1, 1, 1], degree=5))
            ThreePointArc((44.817263122, -4.051286986), (43.694923196, -10.75888874), (41.574578963, -17.220754456))
            Line((41.574578963, -17.220754456), (45.962426412, -19.03826038))
            ThreePointArc((45.962426412, -19.03826038), (47.382241446, -19.930787622), (48.427070577, -21.242584747))
        make_face()
        with BuildLine():
            ThreePointArc((-4.051286986, -44.817263122), (-10.75888874, -43.694923196), (-17.220754456, -41.574578963))
            Line((-17.220754456, -41.574578963), (-19.03826038, -45.962426412))
            ThreePointArc((-19.03826038, -45.962426412), (-19.930787622, -47.382241446), (-21.242584747, -48.427070577))
            add(Edge.make_bspline(
                [(-4.051286986, -44.817263122), (-5.390936461, -44.696164597), (-6.91518351, -44.507915279), (-10.760888336, -44.321320902), (-15.032280406, -45.065924827), (-19.606844419, -47.325192253), (-20.510556933, -48.023261518), (-21.242584747, -48.427070577)],
                knots=[0, 0, 0, 0, 0, 0, 0.5, 0.5, 1, 1, 1, 1, 1, 1], degree=5))
        make_face()
        with BuildLine():
            Line((19.03826038, -45.962426412), (17.220754456, -41.574578963))
            ThreePointArc((17.220754456, -41.574578963), (10.75888874, -43.694923196), (4.051286986, -44.817263122))
            add(Edge.make_bspline(
                [(21.242584747, -48.427070577), (20.510556933, -48.023261518), (19.606844419, -47.325192253), (15.032280406, -45.065924827), (10.760888336, -44.321320902), (6.91518351, -44.507915279), (5.390936461, -44.696164597), (4.051286986, -44.817263122)],
                knots=[0, 0, 0, 0, 0, 0, 0.5, 0.5, 1, 1, 1, 1, 1, 1], degree=5))
            ThreePointArc((21.242584747, -48.427070577), (19.930787622, -47.382241446), (19.03826038, -45.962426412))
        make_face()
    extrude(amount=CONG_1_DEPTH)


with BuildPart() as part_1:
    add(part.part)


with BuildPart() as part_2:
    # Congé1: joined with cong_1_tool
    add(part_1.part.fuse(cong_1_tool.part, tol=0.00001))


solid = part_2.part
